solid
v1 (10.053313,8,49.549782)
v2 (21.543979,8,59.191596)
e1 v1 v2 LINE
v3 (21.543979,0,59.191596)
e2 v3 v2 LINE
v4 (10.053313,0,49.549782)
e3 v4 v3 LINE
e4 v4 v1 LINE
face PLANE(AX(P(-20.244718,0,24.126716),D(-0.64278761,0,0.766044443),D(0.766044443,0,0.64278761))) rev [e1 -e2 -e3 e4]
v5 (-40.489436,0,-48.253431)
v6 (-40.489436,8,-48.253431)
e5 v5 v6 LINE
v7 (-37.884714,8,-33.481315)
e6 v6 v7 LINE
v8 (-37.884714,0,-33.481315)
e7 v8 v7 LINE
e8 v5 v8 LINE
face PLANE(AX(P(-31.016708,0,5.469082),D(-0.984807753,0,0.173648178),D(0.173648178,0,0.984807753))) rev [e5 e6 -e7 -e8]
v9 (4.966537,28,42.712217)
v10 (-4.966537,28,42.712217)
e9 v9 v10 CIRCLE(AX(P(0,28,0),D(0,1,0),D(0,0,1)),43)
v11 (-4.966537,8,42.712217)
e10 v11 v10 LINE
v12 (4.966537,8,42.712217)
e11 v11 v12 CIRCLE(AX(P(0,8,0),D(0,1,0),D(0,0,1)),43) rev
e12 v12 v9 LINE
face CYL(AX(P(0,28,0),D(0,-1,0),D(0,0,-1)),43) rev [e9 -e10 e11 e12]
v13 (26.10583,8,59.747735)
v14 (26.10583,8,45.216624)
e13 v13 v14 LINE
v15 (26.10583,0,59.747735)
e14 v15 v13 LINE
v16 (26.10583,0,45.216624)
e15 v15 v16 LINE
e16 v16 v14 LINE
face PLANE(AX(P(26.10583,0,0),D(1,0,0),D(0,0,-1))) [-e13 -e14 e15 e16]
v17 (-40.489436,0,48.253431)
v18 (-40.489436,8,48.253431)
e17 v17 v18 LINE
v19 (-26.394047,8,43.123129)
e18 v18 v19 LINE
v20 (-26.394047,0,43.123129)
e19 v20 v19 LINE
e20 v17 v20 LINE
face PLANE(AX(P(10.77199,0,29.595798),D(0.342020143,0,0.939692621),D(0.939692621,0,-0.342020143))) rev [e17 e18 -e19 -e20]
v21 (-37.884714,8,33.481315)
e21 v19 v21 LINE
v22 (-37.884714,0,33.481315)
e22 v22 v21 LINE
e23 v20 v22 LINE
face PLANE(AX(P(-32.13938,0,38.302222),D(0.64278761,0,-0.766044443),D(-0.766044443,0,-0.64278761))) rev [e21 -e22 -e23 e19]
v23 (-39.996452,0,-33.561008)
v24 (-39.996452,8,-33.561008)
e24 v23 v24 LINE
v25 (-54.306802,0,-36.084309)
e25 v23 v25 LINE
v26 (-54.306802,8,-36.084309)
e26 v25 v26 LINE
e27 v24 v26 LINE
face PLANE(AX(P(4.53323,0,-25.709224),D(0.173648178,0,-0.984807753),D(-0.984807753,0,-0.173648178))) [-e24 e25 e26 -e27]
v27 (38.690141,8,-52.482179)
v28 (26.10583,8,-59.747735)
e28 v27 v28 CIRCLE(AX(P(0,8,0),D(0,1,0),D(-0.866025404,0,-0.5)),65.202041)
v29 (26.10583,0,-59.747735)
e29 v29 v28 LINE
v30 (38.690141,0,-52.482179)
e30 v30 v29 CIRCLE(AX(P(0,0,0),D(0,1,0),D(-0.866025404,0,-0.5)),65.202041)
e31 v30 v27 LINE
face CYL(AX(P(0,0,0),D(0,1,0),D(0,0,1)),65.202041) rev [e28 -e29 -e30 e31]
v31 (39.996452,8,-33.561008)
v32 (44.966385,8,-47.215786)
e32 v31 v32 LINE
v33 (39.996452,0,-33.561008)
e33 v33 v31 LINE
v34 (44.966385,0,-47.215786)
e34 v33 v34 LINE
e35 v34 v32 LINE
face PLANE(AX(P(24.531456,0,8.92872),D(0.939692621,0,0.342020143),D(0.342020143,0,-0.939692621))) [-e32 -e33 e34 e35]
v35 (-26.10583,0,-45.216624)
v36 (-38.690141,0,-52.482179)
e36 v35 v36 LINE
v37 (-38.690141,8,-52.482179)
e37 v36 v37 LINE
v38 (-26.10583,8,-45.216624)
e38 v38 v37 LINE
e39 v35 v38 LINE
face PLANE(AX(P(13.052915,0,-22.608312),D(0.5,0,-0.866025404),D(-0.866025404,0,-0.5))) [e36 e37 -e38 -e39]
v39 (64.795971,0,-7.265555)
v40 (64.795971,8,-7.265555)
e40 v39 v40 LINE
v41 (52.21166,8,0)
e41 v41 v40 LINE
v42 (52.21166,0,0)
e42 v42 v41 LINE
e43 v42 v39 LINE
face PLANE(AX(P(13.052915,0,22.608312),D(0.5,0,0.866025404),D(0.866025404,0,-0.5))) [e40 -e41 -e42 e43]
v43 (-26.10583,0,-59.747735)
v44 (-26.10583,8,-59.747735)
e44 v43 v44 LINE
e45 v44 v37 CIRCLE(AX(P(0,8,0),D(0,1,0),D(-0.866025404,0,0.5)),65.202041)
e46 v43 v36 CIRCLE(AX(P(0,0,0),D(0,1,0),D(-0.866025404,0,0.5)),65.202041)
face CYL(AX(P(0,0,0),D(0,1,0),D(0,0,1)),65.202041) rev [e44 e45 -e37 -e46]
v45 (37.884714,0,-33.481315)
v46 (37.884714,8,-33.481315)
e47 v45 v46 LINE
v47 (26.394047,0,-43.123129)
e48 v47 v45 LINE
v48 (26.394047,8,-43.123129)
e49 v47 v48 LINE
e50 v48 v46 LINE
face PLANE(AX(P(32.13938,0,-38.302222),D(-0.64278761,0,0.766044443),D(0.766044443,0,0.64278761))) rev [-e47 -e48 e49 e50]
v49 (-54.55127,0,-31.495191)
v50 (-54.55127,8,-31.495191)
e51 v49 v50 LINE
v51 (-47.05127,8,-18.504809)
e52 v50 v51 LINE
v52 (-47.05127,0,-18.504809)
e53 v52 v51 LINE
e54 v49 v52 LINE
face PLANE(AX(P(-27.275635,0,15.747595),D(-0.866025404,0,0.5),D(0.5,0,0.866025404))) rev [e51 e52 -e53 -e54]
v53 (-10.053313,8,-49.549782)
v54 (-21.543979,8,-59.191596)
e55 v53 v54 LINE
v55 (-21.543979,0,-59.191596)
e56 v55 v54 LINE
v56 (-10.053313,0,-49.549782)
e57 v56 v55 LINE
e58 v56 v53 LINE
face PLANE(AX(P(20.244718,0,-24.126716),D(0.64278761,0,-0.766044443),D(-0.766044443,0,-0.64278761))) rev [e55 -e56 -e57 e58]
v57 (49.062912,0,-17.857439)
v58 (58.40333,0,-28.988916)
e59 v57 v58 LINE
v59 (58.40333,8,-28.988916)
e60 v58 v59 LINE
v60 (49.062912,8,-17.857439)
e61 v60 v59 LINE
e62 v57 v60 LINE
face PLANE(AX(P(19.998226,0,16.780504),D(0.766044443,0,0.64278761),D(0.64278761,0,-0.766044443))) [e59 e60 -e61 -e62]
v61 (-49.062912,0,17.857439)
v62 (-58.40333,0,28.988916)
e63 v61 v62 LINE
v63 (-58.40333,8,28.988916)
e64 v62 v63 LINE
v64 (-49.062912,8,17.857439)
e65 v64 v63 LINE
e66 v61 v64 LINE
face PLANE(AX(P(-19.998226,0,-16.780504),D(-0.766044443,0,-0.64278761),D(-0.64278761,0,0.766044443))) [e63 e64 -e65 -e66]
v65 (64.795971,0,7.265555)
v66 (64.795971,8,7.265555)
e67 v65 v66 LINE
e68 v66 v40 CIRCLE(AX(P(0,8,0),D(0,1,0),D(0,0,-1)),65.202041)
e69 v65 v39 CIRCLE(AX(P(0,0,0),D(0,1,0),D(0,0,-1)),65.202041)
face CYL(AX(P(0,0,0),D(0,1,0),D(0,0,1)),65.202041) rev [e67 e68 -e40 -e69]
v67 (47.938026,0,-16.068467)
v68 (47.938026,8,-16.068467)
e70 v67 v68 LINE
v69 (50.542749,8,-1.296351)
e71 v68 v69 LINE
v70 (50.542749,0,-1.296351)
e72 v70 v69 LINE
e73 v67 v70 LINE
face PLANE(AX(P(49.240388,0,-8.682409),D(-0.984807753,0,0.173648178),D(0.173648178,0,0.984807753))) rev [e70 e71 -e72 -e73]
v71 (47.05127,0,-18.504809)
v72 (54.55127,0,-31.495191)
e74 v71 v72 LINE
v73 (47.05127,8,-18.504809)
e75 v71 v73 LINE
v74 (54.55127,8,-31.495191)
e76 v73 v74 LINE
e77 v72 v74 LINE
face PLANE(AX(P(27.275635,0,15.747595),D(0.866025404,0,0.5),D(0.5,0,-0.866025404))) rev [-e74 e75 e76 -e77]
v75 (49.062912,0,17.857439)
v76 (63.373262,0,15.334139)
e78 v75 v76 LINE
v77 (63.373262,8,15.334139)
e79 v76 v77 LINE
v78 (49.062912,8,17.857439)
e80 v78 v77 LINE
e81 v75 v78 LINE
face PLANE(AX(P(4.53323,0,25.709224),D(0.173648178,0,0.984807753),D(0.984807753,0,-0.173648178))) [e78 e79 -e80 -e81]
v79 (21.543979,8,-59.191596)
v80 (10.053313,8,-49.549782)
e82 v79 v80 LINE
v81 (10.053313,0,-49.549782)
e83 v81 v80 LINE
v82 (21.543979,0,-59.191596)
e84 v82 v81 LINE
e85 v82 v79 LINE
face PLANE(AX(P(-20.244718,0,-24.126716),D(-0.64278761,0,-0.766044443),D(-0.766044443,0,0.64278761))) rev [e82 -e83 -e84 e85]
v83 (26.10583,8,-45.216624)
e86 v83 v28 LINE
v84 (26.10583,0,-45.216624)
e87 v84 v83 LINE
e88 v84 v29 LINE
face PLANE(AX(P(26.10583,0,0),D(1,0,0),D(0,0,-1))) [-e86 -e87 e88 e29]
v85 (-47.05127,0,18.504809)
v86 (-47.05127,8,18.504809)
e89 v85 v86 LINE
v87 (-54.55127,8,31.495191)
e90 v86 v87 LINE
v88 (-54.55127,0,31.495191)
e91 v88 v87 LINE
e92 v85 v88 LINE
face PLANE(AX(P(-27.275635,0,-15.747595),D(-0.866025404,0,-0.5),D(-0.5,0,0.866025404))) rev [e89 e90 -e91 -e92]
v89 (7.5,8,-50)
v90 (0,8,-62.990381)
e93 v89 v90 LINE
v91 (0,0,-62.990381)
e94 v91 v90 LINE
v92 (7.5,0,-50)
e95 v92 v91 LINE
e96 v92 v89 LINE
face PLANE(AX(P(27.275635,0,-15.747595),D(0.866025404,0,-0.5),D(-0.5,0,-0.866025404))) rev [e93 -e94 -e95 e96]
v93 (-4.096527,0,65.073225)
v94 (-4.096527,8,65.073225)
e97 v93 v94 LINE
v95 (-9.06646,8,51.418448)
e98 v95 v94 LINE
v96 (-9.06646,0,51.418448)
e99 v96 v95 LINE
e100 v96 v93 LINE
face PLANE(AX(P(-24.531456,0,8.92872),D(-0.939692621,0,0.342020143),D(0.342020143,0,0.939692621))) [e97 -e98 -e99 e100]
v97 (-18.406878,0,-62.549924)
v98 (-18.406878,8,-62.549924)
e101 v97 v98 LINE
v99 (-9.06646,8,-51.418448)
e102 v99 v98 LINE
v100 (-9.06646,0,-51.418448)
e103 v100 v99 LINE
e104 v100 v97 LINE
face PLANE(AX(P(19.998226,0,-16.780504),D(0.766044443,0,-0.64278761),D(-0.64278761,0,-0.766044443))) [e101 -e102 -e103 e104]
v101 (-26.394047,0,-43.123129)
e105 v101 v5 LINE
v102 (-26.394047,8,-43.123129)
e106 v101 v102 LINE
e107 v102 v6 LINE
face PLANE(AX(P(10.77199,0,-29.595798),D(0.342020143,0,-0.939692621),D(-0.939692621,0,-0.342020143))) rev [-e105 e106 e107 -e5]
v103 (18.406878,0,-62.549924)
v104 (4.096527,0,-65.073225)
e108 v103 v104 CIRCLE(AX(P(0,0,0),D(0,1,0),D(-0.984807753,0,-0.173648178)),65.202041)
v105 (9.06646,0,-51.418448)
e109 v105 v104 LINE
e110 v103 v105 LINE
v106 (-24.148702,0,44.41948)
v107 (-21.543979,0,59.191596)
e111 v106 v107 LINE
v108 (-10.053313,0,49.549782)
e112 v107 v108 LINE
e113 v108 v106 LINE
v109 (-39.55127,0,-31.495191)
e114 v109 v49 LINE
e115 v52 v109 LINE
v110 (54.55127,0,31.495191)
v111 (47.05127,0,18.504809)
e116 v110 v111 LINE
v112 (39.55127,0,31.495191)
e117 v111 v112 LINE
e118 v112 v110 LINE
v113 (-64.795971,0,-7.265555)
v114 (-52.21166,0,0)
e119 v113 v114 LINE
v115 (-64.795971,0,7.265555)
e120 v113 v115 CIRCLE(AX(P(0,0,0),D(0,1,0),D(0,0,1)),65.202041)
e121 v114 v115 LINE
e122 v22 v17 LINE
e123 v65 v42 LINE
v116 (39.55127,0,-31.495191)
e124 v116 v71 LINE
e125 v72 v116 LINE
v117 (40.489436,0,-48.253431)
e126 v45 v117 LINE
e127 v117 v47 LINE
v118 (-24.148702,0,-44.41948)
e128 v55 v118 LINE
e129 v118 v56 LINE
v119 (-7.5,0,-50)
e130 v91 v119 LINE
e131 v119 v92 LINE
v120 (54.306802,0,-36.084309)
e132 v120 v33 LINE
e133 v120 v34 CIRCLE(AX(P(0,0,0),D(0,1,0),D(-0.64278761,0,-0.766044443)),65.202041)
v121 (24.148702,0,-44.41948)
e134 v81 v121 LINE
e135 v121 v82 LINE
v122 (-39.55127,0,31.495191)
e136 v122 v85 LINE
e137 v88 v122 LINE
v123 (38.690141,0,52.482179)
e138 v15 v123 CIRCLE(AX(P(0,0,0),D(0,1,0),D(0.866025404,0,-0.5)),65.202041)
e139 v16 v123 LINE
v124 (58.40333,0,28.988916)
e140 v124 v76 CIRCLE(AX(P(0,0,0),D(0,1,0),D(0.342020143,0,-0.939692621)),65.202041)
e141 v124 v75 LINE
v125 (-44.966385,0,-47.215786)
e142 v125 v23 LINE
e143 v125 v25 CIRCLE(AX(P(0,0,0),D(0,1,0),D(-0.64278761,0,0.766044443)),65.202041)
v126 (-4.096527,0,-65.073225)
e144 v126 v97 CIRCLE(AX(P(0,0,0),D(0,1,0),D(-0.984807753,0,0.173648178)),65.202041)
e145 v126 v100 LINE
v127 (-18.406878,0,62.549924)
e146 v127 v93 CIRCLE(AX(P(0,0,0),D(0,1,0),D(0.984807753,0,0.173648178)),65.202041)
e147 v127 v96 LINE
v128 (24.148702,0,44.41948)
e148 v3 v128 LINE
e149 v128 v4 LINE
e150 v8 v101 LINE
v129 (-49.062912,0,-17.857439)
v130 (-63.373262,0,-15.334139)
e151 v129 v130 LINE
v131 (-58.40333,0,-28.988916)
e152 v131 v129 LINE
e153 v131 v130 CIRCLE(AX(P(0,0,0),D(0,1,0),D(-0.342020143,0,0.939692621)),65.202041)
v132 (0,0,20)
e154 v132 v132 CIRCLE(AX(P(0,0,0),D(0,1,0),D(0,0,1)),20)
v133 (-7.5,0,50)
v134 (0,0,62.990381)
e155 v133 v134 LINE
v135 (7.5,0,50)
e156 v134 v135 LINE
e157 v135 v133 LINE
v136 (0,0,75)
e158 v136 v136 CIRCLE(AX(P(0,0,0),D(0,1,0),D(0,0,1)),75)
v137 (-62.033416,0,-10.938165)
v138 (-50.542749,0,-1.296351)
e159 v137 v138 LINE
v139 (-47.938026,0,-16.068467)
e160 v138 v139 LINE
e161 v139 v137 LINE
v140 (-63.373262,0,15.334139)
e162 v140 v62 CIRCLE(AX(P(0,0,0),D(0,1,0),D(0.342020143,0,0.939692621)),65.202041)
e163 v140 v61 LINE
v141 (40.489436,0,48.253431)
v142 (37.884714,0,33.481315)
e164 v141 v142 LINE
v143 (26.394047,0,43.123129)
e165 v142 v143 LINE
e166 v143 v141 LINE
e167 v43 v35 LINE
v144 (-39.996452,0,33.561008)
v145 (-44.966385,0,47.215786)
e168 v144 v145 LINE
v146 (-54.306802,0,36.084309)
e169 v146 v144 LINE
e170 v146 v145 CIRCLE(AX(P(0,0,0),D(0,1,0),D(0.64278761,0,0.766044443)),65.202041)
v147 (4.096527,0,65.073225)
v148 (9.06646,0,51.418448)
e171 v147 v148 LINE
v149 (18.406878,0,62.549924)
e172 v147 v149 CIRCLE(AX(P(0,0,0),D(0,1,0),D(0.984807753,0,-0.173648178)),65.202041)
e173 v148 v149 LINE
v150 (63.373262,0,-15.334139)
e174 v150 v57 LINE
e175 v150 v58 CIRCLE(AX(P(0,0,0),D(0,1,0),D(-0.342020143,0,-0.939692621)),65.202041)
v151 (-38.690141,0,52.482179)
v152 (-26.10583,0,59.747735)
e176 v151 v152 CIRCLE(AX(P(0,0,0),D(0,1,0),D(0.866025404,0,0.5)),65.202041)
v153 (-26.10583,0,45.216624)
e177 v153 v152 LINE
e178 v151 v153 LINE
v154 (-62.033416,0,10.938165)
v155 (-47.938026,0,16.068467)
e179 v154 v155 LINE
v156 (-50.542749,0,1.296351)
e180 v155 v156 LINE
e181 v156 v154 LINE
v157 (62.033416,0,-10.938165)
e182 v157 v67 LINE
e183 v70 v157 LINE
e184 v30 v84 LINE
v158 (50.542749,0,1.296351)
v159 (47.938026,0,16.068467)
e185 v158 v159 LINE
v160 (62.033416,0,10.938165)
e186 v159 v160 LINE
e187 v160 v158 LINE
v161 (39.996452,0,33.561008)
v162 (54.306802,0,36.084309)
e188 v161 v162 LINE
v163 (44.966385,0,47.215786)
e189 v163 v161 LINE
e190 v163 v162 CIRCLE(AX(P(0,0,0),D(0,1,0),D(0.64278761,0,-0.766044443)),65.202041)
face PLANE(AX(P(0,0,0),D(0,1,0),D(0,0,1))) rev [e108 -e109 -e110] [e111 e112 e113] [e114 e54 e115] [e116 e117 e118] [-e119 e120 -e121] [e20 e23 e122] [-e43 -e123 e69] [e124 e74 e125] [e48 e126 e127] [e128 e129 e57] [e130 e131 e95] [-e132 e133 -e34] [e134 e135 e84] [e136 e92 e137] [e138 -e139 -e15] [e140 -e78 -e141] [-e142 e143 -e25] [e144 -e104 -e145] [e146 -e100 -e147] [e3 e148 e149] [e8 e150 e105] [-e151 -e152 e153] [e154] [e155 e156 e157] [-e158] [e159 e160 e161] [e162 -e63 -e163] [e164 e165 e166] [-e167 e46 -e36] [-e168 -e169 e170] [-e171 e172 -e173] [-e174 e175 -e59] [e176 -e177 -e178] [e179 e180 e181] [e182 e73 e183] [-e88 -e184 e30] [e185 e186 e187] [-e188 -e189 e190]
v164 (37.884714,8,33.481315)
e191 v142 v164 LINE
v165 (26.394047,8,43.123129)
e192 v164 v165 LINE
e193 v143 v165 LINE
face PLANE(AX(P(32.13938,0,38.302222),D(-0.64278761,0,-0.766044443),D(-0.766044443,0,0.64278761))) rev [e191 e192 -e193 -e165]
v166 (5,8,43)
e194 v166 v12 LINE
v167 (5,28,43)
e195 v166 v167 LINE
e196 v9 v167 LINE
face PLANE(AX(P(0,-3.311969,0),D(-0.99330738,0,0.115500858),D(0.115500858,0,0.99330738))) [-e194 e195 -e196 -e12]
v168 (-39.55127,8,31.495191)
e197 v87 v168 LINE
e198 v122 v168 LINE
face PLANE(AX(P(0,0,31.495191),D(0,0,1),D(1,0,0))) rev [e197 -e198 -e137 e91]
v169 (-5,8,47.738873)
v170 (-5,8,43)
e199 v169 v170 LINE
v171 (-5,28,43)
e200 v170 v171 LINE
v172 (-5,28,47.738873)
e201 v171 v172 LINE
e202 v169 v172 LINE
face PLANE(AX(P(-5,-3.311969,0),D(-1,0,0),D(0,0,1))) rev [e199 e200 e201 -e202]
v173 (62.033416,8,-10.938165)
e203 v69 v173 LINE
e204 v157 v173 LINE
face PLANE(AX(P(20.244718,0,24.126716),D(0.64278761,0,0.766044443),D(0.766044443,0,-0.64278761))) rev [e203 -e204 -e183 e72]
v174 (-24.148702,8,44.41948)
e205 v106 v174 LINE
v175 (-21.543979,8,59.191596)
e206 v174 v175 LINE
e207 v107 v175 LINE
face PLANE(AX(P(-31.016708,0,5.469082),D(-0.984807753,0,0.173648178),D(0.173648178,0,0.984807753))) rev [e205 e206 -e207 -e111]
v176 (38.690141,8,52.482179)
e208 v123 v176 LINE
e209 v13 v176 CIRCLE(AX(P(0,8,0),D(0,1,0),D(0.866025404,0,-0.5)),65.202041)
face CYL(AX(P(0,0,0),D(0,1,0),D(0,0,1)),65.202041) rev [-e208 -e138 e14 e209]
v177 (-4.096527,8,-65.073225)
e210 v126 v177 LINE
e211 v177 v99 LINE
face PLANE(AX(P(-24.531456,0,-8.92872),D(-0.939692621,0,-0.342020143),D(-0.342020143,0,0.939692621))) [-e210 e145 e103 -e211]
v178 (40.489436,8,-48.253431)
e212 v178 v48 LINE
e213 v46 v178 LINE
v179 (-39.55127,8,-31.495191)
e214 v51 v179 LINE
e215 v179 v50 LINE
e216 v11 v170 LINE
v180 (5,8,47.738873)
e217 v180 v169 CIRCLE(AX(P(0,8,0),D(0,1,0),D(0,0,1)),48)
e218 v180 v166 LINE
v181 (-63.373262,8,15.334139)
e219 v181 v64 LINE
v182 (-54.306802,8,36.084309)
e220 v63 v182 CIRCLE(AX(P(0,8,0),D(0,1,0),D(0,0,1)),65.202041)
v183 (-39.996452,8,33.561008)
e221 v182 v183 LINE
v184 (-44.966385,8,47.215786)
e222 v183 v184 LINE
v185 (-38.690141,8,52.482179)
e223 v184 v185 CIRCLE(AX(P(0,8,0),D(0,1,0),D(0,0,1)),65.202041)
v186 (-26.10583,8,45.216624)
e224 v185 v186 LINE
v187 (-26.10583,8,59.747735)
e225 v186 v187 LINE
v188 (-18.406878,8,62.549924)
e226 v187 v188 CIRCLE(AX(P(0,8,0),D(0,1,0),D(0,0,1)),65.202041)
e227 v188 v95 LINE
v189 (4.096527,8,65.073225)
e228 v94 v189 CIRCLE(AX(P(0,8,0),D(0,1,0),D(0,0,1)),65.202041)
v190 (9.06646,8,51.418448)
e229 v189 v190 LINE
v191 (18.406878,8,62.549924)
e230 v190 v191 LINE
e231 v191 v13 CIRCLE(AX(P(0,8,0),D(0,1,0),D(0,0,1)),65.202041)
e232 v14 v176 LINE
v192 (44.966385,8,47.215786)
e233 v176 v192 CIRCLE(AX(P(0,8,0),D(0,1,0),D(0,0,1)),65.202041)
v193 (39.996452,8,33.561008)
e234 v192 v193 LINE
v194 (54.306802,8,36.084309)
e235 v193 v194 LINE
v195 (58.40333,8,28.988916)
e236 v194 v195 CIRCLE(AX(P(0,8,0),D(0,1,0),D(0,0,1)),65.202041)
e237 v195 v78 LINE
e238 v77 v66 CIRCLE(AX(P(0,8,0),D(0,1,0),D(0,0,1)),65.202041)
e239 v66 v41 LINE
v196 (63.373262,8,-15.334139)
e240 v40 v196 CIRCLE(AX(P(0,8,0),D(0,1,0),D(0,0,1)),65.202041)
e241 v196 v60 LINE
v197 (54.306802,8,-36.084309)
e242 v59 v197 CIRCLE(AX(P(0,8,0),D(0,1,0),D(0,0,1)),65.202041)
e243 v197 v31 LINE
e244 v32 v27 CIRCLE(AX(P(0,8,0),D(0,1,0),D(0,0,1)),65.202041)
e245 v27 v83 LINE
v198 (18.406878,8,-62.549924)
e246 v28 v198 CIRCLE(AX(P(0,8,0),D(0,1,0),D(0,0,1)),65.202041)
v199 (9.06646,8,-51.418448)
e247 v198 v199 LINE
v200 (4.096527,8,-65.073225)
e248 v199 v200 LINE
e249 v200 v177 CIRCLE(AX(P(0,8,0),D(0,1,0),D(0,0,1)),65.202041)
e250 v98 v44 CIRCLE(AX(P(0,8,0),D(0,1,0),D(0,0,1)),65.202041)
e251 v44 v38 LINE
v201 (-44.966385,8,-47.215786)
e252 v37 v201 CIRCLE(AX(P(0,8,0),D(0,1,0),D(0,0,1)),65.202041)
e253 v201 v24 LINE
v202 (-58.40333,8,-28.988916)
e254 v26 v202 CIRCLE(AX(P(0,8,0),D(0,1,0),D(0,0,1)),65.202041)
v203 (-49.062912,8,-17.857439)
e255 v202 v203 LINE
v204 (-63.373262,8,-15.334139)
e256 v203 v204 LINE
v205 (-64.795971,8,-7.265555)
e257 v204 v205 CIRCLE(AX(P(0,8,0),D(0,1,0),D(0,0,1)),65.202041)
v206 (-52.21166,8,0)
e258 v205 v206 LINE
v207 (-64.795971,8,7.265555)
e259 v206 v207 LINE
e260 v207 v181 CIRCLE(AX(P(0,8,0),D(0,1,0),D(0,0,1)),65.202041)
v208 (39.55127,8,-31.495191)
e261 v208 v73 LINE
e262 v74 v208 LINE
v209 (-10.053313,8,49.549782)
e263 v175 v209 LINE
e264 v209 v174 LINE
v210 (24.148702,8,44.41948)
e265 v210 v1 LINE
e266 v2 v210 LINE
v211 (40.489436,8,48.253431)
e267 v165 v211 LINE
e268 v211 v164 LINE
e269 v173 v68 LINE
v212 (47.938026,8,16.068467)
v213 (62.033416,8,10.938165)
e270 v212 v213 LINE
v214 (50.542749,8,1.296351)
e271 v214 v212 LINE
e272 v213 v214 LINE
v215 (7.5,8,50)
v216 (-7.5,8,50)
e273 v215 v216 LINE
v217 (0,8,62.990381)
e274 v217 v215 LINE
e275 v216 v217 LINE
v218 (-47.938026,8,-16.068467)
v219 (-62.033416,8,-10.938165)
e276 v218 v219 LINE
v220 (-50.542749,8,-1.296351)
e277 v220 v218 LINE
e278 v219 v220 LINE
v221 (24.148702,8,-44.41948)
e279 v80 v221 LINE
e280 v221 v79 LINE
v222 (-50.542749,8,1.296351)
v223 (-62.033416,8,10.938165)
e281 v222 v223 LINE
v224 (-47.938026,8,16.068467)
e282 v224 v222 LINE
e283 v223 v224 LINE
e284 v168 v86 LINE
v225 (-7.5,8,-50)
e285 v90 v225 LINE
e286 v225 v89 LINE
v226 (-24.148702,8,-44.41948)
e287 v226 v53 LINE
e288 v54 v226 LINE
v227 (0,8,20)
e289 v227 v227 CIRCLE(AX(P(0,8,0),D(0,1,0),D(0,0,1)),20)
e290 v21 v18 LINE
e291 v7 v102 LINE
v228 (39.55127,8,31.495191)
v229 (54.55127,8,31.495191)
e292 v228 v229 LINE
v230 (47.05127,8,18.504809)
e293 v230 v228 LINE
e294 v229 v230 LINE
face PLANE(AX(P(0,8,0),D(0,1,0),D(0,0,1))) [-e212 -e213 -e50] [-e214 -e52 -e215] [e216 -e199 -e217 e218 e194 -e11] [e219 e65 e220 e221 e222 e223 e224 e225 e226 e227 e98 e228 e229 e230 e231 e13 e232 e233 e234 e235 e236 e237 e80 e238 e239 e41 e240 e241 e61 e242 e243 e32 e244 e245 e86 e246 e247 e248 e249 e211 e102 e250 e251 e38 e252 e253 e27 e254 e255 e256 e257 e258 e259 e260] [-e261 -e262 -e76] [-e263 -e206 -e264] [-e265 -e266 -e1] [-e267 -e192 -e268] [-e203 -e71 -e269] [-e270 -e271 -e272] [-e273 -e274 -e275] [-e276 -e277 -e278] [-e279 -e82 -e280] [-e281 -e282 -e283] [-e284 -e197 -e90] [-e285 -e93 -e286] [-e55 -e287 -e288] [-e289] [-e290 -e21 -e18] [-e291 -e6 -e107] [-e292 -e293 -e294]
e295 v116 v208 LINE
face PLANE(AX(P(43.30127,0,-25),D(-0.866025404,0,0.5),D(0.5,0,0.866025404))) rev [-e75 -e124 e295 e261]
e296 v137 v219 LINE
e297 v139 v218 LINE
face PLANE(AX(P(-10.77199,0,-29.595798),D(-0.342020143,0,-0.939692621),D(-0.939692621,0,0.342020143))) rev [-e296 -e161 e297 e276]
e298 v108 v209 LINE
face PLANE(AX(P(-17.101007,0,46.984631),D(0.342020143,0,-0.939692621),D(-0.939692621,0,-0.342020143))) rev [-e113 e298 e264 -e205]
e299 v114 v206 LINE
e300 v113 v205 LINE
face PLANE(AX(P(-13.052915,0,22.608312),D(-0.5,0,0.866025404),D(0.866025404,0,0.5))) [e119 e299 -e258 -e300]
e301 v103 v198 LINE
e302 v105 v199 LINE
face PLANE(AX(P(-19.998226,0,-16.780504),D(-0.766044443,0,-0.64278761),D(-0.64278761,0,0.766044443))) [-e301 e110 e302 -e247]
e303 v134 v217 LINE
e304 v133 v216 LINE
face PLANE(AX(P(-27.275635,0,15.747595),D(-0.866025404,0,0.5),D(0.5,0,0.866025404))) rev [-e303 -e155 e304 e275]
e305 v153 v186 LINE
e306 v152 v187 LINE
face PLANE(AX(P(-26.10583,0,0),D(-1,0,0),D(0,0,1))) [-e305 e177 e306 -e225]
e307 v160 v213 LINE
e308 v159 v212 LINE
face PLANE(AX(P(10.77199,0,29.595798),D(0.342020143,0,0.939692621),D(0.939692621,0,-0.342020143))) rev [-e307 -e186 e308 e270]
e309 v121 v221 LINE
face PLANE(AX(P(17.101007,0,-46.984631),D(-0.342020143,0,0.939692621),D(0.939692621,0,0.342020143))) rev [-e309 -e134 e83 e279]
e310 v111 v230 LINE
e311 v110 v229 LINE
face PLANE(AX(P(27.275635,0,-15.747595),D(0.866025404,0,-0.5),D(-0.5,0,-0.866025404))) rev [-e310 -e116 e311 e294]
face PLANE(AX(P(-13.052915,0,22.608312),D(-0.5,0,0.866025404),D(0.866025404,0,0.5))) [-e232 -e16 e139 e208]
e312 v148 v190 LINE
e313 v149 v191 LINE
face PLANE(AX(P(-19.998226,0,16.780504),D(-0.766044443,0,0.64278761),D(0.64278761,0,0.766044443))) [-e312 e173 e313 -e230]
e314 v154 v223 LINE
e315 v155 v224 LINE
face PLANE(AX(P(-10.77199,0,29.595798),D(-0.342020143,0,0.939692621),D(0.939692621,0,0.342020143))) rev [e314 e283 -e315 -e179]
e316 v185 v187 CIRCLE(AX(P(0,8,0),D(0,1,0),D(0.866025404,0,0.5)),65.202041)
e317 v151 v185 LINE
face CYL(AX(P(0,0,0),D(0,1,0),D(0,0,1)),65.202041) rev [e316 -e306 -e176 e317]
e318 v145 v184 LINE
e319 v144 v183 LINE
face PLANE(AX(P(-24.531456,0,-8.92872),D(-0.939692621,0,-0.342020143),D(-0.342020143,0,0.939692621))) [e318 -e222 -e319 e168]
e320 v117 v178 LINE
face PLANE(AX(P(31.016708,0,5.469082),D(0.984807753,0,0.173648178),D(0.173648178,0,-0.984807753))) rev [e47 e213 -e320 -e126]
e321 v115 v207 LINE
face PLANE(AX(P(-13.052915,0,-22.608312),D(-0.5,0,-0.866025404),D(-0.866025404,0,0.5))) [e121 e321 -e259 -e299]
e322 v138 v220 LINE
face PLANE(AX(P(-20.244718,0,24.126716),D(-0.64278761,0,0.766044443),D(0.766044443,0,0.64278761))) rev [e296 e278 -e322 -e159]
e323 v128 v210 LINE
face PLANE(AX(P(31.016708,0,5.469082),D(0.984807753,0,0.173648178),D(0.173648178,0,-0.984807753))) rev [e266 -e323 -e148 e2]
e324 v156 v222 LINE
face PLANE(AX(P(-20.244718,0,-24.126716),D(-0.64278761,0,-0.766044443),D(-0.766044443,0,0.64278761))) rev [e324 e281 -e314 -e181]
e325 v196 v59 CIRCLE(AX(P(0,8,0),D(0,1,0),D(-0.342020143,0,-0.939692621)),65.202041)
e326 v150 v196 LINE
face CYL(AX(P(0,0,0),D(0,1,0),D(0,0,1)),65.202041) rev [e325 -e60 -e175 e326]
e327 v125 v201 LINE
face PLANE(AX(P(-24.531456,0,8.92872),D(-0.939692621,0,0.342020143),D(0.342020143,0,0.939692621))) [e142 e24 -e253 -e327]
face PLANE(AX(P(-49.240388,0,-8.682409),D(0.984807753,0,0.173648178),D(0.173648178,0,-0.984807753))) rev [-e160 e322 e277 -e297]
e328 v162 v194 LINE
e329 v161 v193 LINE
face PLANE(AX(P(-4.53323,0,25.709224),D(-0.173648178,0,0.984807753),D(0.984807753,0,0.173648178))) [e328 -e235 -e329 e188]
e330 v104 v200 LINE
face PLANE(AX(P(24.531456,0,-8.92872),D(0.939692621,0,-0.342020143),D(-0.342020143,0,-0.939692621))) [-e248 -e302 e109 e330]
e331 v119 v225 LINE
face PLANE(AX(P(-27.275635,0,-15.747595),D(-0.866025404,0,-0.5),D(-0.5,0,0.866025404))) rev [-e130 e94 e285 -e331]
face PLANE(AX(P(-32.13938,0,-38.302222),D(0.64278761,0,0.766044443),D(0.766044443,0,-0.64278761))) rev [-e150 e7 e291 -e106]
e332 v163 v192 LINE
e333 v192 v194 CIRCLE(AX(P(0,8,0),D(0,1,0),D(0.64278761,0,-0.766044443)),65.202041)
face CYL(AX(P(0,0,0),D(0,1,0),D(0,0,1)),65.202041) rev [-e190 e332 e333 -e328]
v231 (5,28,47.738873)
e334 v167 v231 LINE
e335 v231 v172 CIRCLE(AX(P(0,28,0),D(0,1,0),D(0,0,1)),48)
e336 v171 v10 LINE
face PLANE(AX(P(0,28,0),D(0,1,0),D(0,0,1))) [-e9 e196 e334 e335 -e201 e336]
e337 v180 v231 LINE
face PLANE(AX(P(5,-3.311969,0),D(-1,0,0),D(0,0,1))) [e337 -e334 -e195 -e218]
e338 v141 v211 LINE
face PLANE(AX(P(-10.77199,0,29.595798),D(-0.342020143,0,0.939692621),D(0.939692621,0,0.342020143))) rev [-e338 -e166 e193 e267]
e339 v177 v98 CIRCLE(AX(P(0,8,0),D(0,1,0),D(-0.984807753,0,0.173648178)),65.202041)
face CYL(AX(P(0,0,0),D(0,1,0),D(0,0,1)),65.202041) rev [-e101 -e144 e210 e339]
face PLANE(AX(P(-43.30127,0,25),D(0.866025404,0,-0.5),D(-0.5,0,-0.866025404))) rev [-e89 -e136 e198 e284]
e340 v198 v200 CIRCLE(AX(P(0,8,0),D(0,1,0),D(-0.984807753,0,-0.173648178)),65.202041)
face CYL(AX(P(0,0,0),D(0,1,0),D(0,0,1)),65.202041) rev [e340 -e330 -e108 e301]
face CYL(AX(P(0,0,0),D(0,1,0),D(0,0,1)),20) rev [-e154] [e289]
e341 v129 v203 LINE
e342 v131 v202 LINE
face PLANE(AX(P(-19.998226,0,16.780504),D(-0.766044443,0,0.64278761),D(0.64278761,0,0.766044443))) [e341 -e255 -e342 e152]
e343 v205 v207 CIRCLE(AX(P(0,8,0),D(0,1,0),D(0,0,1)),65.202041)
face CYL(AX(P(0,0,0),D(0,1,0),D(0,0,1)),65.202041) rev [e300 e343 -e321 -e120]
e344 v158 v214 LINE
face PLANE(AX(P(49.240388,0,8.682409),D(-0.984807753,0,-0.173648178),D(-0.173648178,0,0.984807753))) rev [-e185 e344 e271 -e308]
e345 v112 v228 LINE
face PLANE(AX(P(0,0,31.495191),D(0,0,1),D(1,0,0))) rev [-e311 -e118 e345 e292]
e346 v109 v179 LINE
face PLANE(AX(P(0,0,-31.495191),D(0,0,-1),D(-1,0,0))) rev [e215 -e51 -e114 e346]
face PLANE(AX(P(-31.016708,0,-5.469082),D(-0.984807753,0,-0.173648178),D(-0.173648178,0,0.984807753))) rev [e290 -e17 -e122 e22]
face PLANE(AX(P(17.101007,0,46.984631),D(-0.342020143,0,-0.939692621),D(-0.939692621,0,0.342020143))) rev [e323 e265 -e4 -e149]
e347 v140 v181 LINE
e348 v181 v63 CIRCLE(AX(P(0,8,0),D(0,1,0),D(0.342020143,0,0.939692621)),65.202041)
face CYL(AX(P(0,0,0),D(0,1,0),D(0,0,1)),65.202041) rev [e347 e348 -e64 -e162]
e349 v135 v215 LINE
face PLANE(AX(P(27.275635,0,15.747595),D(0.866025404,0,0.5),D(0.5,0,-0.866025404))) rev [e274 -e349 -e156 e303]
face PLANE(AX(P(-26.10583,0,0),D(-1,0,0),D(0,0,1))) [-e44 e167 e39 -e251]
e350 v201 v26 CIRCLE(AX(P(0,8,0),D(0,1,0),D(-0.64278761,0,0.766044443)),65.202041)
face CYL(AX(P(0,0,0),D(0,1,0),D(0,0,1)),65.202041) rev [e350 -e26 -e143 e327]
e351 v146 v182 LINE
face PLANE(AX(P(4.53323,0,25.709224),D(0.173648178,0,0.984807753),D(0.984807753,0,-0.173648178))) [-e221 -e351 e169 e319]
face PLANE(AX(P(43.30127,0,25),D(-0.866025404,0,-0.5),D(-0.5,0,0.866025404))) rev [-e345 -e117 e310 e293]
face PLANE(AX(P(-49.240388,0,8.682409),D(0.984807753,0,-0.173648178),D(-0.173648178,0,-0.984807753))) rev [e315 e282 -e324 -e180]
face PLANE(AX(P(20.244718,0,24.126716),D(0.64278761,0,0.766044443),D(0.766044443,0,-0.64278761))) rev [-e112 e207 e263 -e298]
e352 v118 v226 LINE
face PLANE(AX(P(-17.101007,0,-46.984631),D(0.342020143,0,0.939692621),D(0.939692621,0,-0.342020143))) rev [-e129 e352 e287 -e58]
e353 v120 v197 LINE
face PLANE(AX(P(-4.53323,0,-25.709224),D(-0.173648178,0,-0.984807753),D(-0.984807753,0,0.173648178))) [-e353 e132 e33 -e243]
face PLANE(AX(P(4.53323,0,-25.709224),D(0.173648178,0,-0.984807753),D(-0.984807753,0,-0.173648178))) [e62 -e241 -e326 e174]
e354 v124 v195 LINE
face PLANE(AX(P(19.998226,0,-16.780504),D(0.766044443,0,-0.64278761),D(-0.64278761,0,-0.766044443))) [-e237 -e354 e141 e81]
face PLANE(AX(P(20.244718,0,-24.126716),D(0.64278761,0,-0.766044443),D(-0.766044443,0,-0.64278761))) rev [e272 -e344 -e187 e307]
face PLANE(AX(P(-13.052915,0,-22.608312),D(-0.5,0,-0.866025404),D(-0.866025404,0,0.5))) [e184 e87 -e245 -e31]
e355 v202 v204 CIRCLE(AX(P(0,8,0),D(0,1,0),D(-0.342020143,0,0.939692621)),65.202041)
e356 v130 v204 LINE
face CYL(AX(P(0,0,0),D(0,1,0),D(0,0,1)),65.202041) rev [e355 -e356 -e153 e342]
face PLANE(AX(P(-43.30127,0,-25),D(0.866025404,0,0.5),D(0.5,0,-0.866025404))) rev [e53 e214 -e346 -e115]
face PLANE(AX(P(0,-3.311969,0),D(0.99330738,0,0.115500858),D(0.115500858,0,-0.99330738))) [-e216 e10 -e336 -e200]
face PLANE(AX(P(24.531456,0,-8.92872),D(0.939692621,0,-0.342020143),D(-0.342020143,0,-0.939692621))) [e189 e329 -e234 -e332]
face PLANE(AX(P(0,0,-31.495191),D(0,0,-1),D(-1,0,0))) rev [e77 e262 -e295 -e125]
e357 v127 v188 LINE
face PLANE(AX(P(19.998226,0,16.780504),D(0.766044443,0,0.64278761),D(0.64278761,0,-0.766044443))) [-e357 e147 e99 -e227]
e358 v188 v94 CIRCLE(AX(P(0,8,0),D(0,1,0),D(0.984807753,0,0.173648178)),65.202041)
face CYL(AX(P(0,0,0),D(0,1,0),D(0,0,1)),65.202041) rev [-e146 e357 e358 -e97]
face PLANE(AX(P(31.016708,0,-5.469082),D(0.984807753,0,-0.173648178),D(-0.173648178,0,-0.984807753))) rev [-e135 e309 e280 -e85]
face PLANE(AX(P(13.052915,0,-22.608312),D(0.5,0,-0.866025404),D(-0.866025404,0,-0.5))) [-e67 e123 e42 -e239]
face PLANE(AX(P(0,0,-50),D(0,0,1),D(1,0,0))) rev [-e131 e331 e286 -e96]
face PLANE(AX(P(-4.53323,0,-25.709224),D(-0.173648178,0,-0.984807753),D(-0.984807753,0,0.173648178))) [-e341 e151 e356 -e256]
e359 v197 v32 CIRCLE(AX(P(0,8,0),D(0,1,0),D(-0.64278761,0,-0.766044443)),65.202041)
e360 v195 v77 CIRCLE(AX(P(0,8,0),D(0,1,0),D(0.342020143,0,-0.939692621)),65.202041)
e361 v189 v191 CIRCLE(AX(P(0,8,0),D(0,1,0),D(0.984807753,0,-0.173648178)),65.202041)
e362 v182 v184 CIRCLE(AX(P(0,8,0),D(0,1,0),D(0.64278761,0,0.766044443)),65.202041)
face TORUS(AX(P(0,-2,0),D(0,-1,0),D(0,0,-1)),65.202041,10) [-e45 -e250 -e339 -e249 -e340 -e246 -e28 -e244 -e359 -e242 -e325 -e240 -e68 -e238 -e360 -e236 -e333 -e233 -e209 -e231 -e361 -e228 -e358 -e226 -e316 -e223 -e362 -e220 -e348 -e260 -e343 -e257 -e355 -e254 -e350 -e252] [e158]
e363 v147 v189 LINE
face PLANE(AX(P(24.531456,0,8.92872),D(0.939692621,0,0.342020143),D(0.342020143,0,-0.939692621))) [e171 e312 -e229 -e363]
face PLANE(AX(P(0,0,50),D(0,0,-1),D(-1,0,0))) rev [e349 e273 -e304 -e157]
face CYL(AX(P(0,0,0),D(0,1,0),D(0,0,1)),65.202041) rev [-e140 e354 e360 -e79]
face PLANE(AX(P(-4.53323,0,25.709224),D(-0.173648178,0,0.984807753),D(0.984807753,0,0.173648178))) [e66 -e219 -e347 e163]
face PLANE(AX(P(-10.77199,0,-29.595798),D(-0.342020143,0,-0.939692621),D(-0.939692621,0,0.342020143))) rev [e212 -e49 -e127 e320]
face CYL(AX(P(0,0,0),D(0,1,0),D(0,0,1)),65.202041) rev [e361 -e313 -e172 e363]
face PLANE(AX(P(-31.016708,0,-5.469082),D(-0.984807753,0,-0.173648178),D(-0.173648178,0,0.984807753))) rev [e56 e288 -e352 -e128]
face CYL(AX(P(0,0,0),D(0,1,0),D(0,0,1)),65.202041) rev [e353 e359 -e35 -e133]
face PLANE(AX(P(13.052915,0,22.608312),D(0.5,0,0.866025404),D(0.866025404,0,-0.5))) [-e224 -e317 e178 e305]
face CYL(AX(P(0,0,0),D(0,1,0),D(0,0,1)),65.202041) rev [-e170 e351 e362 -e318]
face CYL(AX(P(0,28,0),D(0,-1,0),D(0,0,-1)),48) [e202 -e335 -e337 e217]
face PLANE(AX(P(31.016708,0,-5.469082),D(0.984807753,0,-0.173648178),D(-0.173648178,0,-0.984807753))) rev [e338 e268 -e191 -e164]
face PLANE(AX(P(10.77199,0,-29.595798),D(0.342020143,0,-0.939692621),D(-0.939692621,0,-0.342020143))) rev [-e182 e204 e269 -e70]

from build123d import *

# Parameters (mm, degrees)
SKETCH1_R           = 75
BOSS_EXTRUDE1_DEPTH = 8
SKETCH2_R           = 48
SKETCH2_R_2         = 43
BOSS_EXTRUDE3_DEPTH = 20
CUT_EXTRUDE2_START  = -20
CUT_EXTRUDE2_DEPTH  = 20
FILLET1_R           = 10
CUT_EXTRUDE3_DEPTH  = 108.935165725
CIRPATTERN1_COUNT   = 18
SKETCH9_R           = 20
CUT_EXTRUDE4_DEPTH  = 108.935165725


with BuildPart() as part:
    # Sketch1 → Boss-Extrude1 (new body)
    with BuildSketch(Plane(origin=(0, 0, 0), x_dir=(1, 0, 0), z_dir=(0, 1, 0))):
        with Locations(Location((0, 0, 0), (0, 0, 270))):
            Circle(SKETCH1_R)
    extrude(amount=BOSS_EXTRUDE1_DEPTH)

    # Sketch2 → Boss-Extrude3 (add)
    with BuildSketch(Plane(origin=(0, 8, 0), x_dir=(1, 0, 0), z_dir=(0, 1, 0))):
        with Locations(Location((0, 0, 0), (0, 0, 270))):
            Circle(SKETCH2_R)
        with Locations(Location((0, 0, 0), (0, 0, 270))):
            Circle(SKETCH2_R_2, mode=Mode.SUBTRACT)
    extrude(amount=BOSS_EXTRUDE3_DEPTH)

    # Sketch7 → Cut-Extrude2 (cut)
    with BuildSketch(Plane(origin=(0, 28, 0), x_dir=(1, 0, 0), z_dir=(0, 1, 0)).offset(CUT_EXTRUDE2_START)):
        with BuildLine():
            Line((0, -43), (-5, -43))
            Line((-5, -43), (-5, -47.738873049))
            ThreePointArc((-5, -47.738873049), (-2.503407043, -47.934673809), (0, -48))
            ThreePointArc((0, -48), (2.503407043, -47.934673809), (5, -47.738873049))
            Line((5, -47.738873049), (5, -43))
            Line((5, -43), (0, -43))
        make_face()
        with BuildLine():
            ThreePointArc((0, -48), (-2.503407043, -47.934673809), (-5, -47.738873049))
            Line((-5, -47.738873049), (-5, -48))
            Line((-5, -48), (0, -48))
        make_face()
        with BuildLine():
            ThreePointArc((5, -47.738873049), (2.503407043, -47.934673809), (0, -48))
            Line((0, -48), (5, -48))
            Line((5, -48), (5, -47.738873049))
        make_face()
        with BuildLine():
            ThreePointArc((4.966536902, -42.712217353), (2.4874338, -42.927994049), (0, -43))
            Line((0, -43), (5, -43))
            Line((5, -43), (4.966536902, -42.712217353))
        make_face()
        with BuildLine():
            Line((-4.966536902, -42.712217353), (-5, -43))
            Line((-5, -43), (0, -43))
            ThreePointArc((0, -43), (-2.4874338, -42.927994049), (-4.966536902, -42.712217353))
        make_face()
    extrude(amount=CUT_EXTRUDE2_DEPTH, mode=Mode.SUBTRACT)

    # Fillet1
    # the kernel refuses this fillet: 10 mm, written as the material it takes off along each edge
    with BuildSketch(Plane(origin=(0, 8, 0), x_dir=(0, 0, 1), z_dir=(-1, 0, 0))) as fillet1_piece_1:
        with BuildLine():
            CenterArc((65.202041029, -10), FILLET1_R, 11.536959033, 78.463040967)
            Line((65.202041029, 0), (65.202041029, 0.2))
            Line((65.202041029, 0.2), (75, 0.2))
            Line((75, 0.2), (75.2, 0))
            ThreePointArc((75.2, 0), (75.2, -4), (75.195959179, -7.96))
            Line((75.195959179, -7.96), (75, -8))
        make_face()
    revolve(axis=Axis((0, 8, 0), (0, 1, 0)), mode=Mode.SUBTRACT)

    # Sketch8 → Cut-Extrude3 (cut, through all)
    with BuildSketch(Plane(origin=(0, 8, 0), x_dir=(1, 0, 0), z_dir=(0, 1, 0))):
        with BuildLine():
            Line((-64.795971013, -7.265555367), (-52.211659972, 0))
            Line((-52.211659972, 0), (-64.795971013, 7.265555367))
            ThreePointArc((-64.795971013, 7.265555367), (-65.100444372, 3.638447047), (-65.202041029, 0))
            ThreePointArc((-65.202041029, 0), (-65.100444372, -3.638447047), (-64.795971013, -7.265555367))
        make_face()
        Polygon((-50.542748983, 1.296350736), (-47.938026318, 16.068467031), (-62.03341563, 10.938164881), align=None)
    cut_extrude3 = extrude(amount=-CUT_EXTRUDE3_DEPTH, mode=Mode.SUBTRACT)

    # CirPattern1: Cut-Extrude3 ×18 about axis
    cirpattern1_axis = Axis((0, 0, 0), (0, 1, 0))
    for i in range(1, CIRPATTERN1_COUNT):
        add(cut_extrude3.rotate(cirpattern1_axis, i * 360 / CIRPATTERN1_COUNT), mode=Mode.SUBTRACT)

    # Sketch9 → Cut-Extrude4 (cut, through all)
    with BuildSketch(Plane(origin=(0, 8, 0), x_dir=(1, 0, 0), z_dir=(0, 1, 0))):
        with Locations(Location((0, 0, 0), (0, 0, 270))):
            Circle(SKETCH9_R)
    extrude(amount=-CUT_EXTRUDE4_DEPTH, mode=Mode.SUBTRACT)


solid = part.part
